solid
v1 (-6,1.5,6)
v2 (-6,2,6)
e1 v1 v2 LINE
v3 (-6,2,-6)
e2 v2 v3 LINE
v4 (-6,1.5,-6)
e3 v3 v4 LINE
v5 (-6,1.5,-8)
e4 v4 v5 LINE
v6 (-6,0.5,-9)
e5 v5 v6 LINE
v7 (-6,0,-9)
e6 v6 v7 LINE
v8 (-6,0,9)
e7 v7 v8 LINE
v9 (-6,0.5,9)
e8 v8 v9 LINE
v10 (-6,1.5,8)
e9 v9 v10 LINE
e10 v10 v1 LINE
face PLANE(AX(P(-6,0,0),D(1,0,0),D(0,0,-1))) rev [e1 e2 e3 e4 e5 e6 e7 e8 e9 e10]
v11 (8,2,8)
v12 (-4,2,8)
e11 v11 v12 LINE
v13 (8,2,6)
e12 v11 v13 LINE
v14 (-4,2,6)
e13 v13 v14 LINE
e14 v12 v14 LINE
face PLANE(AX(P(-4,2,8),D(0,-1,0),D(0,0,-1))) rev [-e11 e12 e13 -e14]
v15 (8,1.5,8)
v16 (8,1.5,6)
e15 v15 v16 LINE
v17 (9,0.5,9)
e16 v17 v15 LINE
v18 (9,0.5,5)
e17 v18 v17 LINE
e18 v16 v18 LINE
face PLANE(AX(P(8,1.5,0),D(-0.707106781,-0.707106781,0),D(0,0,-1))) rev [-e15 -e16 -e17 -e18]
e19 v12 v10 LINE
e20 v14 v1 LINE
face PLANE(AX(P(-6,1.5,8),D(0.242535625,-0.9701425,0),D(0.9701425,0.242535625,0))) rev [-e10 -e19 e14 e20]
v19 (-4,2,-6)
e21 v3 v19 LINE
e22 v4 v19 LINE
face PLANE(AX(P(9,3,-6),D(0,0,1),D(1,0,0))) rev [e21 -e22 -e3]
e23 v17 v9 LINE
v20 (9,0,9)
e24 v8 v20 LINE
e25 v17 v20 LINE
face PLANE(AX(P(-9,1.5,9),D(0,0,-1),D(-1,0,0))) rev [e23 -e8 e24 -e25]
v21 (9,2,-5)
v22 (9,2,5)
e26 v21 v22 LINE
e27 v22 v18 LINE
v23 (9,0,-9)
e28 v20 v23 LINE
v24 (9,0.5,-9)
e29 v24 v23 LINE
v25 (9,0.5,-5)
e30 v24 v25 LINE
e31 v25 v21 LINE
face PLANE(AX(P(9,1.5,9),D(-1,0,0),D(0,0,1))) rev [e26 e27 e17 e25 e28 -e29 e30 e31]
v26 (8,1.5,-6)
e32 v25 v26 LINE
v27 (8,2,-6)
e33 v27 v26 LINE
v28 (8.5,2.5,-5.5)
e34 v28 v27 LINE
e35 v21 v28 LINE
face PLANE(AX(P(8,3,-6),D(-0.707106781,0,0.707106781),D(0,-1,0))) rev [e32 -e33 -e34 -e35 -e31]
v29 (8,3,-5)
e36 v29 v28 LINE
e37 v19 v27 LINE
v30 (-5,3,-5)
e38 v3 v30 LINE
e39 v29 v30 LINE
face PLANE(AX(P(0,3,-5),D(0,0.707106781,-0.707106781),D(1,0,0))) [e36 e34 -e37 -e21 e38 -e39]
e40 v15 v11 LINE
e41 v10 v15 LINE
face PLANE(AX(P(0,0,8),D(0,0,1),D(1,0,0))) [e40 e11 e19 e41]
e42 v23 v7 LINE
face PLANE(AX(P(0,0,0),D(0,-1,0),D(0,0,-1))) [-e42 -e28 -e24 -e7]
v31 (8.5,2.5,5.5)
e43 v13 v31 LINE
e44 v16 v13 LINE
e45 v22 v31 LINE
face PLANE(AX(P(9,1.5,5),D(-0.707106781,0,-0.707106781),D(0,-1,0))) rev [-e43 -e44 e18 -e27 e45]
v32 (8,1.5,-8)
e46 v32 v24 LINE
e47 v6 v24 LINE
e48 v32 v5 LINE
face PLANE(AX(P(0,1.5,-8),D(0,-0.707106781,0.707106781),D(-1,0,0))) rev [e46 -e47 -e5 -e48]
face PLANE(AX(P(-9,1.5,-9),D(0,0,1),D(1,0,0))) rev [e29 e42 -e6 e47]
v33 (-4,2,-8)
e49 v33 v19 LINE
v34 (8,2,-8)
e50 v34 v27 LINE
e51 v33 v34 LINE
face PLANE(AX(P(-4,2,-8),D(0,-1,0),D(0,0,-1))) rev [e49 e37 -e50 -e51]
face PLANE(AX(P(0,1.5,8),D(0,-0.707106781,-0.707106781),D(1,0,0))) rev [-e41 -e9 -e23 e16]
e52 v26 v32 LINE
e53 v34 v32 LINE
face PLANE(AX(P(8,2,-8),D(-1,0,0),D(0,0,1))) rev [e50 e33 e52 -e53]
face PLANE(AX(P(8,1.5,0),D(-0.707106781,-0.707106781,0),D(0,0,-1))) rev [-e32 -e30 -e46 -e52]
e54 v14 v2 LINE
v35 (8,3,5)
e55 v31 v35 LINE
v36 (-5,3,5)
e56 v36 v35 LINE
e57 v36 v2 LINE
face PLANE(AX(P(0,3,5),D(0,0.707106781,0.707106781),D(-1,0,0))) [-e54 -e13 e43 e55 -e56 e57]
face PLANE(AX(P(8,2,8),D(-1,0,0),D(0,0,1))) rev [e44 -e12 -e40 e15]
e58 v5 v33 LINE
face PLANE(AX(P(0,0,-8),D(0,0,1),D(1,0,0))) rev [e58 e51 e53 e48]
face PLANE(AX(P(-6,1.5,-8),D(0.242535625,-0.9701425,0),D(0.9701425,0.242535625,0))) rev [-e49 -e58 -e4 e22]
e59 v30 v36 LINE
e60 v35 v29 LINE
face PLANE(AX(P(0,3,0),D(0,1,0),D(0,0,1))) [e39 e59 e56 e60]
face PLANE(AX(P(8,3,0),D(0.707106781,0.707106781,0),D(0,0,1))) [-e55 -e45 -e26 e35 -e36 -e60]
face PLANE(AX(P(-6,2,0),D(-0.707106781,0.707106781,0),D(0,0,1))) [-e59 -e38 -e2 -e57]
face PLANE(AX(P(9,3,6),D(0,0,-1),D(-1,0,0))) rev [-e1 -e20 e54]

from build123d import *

# Parameters (mm, degrees)
SKETCH_1_W          = 18
SKETCH_1_H          = 18
EXTRUDE_1_DEPTH     = 1.5
CHAMFER_1_SIZE      = 1
SKETCH_2_W          = 18
SKETCH_2_H          = 12
EXTRUDE_2_DEPTH     = 1.5
CHAMFER_2_SIZE      = 1
CHAMFER_3_SIZE      = 1
CUT_EXTRUDE_2_DEPTH = 3
CHAMFER_5_SIZE      = 1
CUT_EXTRUDE_5_DEPTH = 3
EXTRUDE_12_DEPTH    = 2
EXTRUDE_13_DEPTH    = 2


with BuildPart() as part:
    # 草图1 → 凸台-拉伸1 (new body)
    with BuildSketch(Plane(origin=(0, 0, 0), x_dir=(1, 0, 0), z_dir=(0, 1, 0))):
        Rectangle(SKETCH_1_W, SKETCH_1_H)
    extrude(amount=EXTRUDE_1_DEPTH)

    # 倒角1
    chamfer_1_edges = [part.edges().sort_by_distance(p)[0] for p in [
        (0, 1.5, 9),
        (0, 1.5, -9),
    ]]
    chamfer(chamfer_1_edges, length=CHAMFER_1_SIZE)

    # 草图2 → 凸台-拉伸2 (add)
    with BuildSketch(Plane(origin=(0, 1.5, 0), x_dir=(1, 0, 0), z_dir=(0, 1, 0))):
        Rectangle(SKETCH_2_W, SKETCH_2_H)
    extrude(amount=EXTRUDE_2_DEPTH)

    # 倒角2
    chamfer_2_edges = [part.edges().sort_by_distance(p)[0] for p in [
        (0, 3, 6),
        (0, 3, -6),
    ]]
    chamfer(chamfer_2_edges, length=CHAMFER_2_SIZE)

    # 倒角3
    # the kernel refuses this chamfer: 1 mm, written as the material it takes off along each edge
    with BuildSketch(Plane(origin=(9, 1.5, 6), x_dir=(-0.9996219169112968, 0, 0.027495876610586487), z_dir=(0, 1, 0))) as chamfer_3_piece_1:
        Polygon((CHAMFER_3_SIZE * 0.999621916911, -CHAMFER_3_SIZE * 0.0274958766106), (-CHAMFER_3_SIZE * 0.0274958766106, -CHAMFER_3_SIZE * 0.999621916911), (0, 0), align=None)
    extrude(amount=3.071682988, mode=Mode.SUBTRACT)
    with BuildSketch(Plane(origin=(9, 1.5, 10.571682988), x_dir=(-0.9996219169112968, 0.02749587661058627, 0), z_dir=(0, 0, -1)), Plane(origin=(9, 1.5, -6), x_dir=(-0.9996219169112968, 0.02749587661058627, 0), z_dir=(0, 0, -1))) as chamfer_3_piece_2:
        Polygon((CHAMFER_3_SIZE * 0.999621916911, -CHAMFER_3_SIZE * 0.0274958766106), (-CHAMFER_3_SIZE * 0.0274958766106, -CHAMFER_3_SIZE * 0.999621916911), (0, 0), align=None)
    extrude(amount=4.571682988, mode=Mode.SUBTRACT)
    with BuildSketch(Plane(origin=(9, 1.5, -6), x_dir=(-0.9996219169112968, 0, -0.027495876610586535), z_dir=(0, 1, 0))) as chamfer_3_piece_3:
        Polygon((CHAMFER_3_SIZE * 0.999621916911, CHAMFER_3_SIZE * 0.0274958766106), (-CHAMFER_3_SIZE * 0.0274958766106, CHAMFER_3_SIZE * 0.999621916911), (0, 0), align=None)
    extrude(amount=3.071682988, mode=Mode.SUBTRACT)
    with BuildSketch(Plane(origin=(9, 3, -7.571682988), x_dir=(-0.9996219169112968, 0.027495876610586487, 0), z_dir=(0, 0, 1))) as chamfer_3_piece_4:
        Polygon((CHAMFER_3_SIZE * 0.999621916911, CHAMFER_3_SIZE * 0.0274958766106), (-CHAMFER_3_SIZE * 0.0274958766106, CHAMFER_3_SIZE * 0.999621916911), (0, 0), align=None)
    extrude(amount=15.143365976, mode=Mode.SUBTRACT)
    with BuildSketch(Plane(origin=(9, -1.071682988, 6), x_dir=(-0.9996219169112968, 0, 0.027495876610586487), z_dir=(0, 1, 0))) as chamfer_3_piece_5a_section:
        Polygon((CHAMFER_3_SIZE * 0.999621916911, -CHAMFER_3_SIZE * 0.0274958766106), (-CHAMFER_3_SIZE * 0.0274958766106, -CHAMFER_3_SIZE * 0.999621916911), (0, 0), align=None)
    chamfer_3_piece_5a = extrude(amount=5.643365976, mode=Mode.PRIVATE)
    chamfer_3_piece_5a = split(chamfer_3_piece_5a, bisect_by=Plane(origin=(8.670206373, 1.5, 5.670206373), z_dir=(0, -1, 0)), keep=Keep.TOP, mode=Mode.PRIVATE)
    with BuildSketch(Plane(origin=(9, 1.5, 10.571682988), x_dir=(-0.9996219169112968, 0.02749587661058627, 0), z_dir=(0, 0, -1))) as chamfer_3_piece_5b_section:
        Polygon((CHAMFER_3_SIZE * 0.999621916911, -CHAMFER_3_SIZE * 0.0274958766106), (-CHAMFER_3_SIZE * 0.0274958766106, -CHAMFER_3_SIZE * 0.999621916911), (0, 0), align=None)
    chamfer_3_piece_5b = extrude(amount=7.143365976, mode=Mode.PRIVATE)
    chamfer_3_piece_5b = split(chamfer_3_piece_5b, bisect_by=Plane(origin=(8.670206373, 1.170206373, 6), z_dir=(0, 0, -1)), keep=Keep.TOP, mode=Mode.PRIVATE)
    chamfer_3_piece_5 = chamfer_3_piece_5a & chamfer_3_piece_5b
    add(chamfer_3_piece_5, mode=Mode.SUBTRACT)
    with BuildSketch(Plane(origin=(9, -1.071682988, -6), x_dir=(-0.9996219169112968, 0, -0.027495876610586487), z_dir=(0, 1, 0))) as chamfer_3_piece_6a_section:
        Polygon((CHAMFER_3_SIZE * 0.999621916911, CHAMFER_3_SIZE * 0.0274958766106), (-CHAMFER_3_SIZE * 0.0274958766106, CHAMFER_3_SIZE * 0.999621916911), (0, 0), align=None)
    chamfer_3_piece_6a = extrude(amount=5.643365976, mode=Mode.PRIVATE)
    chamfer_3_piece_6a = split(chamfer_3_piece_6a, bisect_by=Plane(origin=(8.670206373, 1.5, -5.670206373), z_dir=(0, -1, 0)), keep=Keep.TOP, mode=Mode.PRIVATE)
    with BuildSketch(Plane(origin=(9, 1.5, -3.428317012), x_dir=(-0.9996219169112968, 0.02749587661058627, 0), z_dir=(0, 0, -1))) as chamfer_3_piece_6b_section:
        Polygon((CHAMFER_3_SIZE * 0.999621916911, -CHAMFER_3_SIZE * 0.0274958766106), (-CHAMFER_3_SIZE * 0.0274958766106, -CHAMFER_3_SIZE * 0.999621916911), (0, 0), align=None)
    chamfer_3_piece_6b = extrude(amount=7.143365976, mode=Mode.PRIVATE)
    chamfer_3_piece_6b = split(chamfer_3_piece_6b, bisect_by=Plane(origin=(8.670206373, 1.170206373, -6), z_dir=(0, 0, 1)), keep=Keep.TOP, mode=Mode.PRIVATE)
    chamfer_3_piece_6 = chamfer_3_piece_6a & chamfer_3_piece_6b
    add(chamfer_3_piece_6, mode=Mode.SUBTRACT)

    # 草图9 → 切除-拉伸2 (cut)
    with BuildSketch(Plane.ZY.offset(9)):
        Polygon((-6, 1.5), (-6, 2), (-5, 3), (5, 3), (6, 2), (6, 1.5), align=None)
    extrude(amount=-CUT_EXTRUDE_2_DEPTH, mode=Mode.SUBTRACT)

    # 倒角5
    chamfer_5_edges = [part.edges().sort_by_distance(p)[0] for p in [
        (-6, 3, 0),
    ]]
    chamfer(chamfer_5_edges, length=CHAMFER_5_SIZE)

    # 草图23 → 切除-拉伸5 (cut)
    with BuildSketch(Plane.ZY.offset(9)):
        Polygon((9, 0.5), (8, 1.5), (-8, 1.5), (-9, 0.5), (-9, 0), (9, 0), align=None)
    extrude(amount=-CUT_EXTRUDE_5_DEPTH, mode=Mode.SUBTRACT)

    # 草图24 → 凸台-拉伸12 (add)
    with BuildSketch(Plane(origin=(0, 0, -6), x_dir=(-1, 0, 0), z_dir=(0, 0, -1))):
        Polygon((6, 1.5), (4, 2), (-8, 2), (-8, 1.5), align=None)
    extrude(amount=EXTRUDE_12_DEPTH)

    # 草图25 → 凸台-拉伸13 (add)
    with BuildSketch(Plane.XY.offset(6)):
        Polygon((-6, 1.5), (-4, 2), (8, 2), (8, 1.5), align=None)
    extrude(amount=EXTRUDE_13_DEPTH)


solid = part.part
